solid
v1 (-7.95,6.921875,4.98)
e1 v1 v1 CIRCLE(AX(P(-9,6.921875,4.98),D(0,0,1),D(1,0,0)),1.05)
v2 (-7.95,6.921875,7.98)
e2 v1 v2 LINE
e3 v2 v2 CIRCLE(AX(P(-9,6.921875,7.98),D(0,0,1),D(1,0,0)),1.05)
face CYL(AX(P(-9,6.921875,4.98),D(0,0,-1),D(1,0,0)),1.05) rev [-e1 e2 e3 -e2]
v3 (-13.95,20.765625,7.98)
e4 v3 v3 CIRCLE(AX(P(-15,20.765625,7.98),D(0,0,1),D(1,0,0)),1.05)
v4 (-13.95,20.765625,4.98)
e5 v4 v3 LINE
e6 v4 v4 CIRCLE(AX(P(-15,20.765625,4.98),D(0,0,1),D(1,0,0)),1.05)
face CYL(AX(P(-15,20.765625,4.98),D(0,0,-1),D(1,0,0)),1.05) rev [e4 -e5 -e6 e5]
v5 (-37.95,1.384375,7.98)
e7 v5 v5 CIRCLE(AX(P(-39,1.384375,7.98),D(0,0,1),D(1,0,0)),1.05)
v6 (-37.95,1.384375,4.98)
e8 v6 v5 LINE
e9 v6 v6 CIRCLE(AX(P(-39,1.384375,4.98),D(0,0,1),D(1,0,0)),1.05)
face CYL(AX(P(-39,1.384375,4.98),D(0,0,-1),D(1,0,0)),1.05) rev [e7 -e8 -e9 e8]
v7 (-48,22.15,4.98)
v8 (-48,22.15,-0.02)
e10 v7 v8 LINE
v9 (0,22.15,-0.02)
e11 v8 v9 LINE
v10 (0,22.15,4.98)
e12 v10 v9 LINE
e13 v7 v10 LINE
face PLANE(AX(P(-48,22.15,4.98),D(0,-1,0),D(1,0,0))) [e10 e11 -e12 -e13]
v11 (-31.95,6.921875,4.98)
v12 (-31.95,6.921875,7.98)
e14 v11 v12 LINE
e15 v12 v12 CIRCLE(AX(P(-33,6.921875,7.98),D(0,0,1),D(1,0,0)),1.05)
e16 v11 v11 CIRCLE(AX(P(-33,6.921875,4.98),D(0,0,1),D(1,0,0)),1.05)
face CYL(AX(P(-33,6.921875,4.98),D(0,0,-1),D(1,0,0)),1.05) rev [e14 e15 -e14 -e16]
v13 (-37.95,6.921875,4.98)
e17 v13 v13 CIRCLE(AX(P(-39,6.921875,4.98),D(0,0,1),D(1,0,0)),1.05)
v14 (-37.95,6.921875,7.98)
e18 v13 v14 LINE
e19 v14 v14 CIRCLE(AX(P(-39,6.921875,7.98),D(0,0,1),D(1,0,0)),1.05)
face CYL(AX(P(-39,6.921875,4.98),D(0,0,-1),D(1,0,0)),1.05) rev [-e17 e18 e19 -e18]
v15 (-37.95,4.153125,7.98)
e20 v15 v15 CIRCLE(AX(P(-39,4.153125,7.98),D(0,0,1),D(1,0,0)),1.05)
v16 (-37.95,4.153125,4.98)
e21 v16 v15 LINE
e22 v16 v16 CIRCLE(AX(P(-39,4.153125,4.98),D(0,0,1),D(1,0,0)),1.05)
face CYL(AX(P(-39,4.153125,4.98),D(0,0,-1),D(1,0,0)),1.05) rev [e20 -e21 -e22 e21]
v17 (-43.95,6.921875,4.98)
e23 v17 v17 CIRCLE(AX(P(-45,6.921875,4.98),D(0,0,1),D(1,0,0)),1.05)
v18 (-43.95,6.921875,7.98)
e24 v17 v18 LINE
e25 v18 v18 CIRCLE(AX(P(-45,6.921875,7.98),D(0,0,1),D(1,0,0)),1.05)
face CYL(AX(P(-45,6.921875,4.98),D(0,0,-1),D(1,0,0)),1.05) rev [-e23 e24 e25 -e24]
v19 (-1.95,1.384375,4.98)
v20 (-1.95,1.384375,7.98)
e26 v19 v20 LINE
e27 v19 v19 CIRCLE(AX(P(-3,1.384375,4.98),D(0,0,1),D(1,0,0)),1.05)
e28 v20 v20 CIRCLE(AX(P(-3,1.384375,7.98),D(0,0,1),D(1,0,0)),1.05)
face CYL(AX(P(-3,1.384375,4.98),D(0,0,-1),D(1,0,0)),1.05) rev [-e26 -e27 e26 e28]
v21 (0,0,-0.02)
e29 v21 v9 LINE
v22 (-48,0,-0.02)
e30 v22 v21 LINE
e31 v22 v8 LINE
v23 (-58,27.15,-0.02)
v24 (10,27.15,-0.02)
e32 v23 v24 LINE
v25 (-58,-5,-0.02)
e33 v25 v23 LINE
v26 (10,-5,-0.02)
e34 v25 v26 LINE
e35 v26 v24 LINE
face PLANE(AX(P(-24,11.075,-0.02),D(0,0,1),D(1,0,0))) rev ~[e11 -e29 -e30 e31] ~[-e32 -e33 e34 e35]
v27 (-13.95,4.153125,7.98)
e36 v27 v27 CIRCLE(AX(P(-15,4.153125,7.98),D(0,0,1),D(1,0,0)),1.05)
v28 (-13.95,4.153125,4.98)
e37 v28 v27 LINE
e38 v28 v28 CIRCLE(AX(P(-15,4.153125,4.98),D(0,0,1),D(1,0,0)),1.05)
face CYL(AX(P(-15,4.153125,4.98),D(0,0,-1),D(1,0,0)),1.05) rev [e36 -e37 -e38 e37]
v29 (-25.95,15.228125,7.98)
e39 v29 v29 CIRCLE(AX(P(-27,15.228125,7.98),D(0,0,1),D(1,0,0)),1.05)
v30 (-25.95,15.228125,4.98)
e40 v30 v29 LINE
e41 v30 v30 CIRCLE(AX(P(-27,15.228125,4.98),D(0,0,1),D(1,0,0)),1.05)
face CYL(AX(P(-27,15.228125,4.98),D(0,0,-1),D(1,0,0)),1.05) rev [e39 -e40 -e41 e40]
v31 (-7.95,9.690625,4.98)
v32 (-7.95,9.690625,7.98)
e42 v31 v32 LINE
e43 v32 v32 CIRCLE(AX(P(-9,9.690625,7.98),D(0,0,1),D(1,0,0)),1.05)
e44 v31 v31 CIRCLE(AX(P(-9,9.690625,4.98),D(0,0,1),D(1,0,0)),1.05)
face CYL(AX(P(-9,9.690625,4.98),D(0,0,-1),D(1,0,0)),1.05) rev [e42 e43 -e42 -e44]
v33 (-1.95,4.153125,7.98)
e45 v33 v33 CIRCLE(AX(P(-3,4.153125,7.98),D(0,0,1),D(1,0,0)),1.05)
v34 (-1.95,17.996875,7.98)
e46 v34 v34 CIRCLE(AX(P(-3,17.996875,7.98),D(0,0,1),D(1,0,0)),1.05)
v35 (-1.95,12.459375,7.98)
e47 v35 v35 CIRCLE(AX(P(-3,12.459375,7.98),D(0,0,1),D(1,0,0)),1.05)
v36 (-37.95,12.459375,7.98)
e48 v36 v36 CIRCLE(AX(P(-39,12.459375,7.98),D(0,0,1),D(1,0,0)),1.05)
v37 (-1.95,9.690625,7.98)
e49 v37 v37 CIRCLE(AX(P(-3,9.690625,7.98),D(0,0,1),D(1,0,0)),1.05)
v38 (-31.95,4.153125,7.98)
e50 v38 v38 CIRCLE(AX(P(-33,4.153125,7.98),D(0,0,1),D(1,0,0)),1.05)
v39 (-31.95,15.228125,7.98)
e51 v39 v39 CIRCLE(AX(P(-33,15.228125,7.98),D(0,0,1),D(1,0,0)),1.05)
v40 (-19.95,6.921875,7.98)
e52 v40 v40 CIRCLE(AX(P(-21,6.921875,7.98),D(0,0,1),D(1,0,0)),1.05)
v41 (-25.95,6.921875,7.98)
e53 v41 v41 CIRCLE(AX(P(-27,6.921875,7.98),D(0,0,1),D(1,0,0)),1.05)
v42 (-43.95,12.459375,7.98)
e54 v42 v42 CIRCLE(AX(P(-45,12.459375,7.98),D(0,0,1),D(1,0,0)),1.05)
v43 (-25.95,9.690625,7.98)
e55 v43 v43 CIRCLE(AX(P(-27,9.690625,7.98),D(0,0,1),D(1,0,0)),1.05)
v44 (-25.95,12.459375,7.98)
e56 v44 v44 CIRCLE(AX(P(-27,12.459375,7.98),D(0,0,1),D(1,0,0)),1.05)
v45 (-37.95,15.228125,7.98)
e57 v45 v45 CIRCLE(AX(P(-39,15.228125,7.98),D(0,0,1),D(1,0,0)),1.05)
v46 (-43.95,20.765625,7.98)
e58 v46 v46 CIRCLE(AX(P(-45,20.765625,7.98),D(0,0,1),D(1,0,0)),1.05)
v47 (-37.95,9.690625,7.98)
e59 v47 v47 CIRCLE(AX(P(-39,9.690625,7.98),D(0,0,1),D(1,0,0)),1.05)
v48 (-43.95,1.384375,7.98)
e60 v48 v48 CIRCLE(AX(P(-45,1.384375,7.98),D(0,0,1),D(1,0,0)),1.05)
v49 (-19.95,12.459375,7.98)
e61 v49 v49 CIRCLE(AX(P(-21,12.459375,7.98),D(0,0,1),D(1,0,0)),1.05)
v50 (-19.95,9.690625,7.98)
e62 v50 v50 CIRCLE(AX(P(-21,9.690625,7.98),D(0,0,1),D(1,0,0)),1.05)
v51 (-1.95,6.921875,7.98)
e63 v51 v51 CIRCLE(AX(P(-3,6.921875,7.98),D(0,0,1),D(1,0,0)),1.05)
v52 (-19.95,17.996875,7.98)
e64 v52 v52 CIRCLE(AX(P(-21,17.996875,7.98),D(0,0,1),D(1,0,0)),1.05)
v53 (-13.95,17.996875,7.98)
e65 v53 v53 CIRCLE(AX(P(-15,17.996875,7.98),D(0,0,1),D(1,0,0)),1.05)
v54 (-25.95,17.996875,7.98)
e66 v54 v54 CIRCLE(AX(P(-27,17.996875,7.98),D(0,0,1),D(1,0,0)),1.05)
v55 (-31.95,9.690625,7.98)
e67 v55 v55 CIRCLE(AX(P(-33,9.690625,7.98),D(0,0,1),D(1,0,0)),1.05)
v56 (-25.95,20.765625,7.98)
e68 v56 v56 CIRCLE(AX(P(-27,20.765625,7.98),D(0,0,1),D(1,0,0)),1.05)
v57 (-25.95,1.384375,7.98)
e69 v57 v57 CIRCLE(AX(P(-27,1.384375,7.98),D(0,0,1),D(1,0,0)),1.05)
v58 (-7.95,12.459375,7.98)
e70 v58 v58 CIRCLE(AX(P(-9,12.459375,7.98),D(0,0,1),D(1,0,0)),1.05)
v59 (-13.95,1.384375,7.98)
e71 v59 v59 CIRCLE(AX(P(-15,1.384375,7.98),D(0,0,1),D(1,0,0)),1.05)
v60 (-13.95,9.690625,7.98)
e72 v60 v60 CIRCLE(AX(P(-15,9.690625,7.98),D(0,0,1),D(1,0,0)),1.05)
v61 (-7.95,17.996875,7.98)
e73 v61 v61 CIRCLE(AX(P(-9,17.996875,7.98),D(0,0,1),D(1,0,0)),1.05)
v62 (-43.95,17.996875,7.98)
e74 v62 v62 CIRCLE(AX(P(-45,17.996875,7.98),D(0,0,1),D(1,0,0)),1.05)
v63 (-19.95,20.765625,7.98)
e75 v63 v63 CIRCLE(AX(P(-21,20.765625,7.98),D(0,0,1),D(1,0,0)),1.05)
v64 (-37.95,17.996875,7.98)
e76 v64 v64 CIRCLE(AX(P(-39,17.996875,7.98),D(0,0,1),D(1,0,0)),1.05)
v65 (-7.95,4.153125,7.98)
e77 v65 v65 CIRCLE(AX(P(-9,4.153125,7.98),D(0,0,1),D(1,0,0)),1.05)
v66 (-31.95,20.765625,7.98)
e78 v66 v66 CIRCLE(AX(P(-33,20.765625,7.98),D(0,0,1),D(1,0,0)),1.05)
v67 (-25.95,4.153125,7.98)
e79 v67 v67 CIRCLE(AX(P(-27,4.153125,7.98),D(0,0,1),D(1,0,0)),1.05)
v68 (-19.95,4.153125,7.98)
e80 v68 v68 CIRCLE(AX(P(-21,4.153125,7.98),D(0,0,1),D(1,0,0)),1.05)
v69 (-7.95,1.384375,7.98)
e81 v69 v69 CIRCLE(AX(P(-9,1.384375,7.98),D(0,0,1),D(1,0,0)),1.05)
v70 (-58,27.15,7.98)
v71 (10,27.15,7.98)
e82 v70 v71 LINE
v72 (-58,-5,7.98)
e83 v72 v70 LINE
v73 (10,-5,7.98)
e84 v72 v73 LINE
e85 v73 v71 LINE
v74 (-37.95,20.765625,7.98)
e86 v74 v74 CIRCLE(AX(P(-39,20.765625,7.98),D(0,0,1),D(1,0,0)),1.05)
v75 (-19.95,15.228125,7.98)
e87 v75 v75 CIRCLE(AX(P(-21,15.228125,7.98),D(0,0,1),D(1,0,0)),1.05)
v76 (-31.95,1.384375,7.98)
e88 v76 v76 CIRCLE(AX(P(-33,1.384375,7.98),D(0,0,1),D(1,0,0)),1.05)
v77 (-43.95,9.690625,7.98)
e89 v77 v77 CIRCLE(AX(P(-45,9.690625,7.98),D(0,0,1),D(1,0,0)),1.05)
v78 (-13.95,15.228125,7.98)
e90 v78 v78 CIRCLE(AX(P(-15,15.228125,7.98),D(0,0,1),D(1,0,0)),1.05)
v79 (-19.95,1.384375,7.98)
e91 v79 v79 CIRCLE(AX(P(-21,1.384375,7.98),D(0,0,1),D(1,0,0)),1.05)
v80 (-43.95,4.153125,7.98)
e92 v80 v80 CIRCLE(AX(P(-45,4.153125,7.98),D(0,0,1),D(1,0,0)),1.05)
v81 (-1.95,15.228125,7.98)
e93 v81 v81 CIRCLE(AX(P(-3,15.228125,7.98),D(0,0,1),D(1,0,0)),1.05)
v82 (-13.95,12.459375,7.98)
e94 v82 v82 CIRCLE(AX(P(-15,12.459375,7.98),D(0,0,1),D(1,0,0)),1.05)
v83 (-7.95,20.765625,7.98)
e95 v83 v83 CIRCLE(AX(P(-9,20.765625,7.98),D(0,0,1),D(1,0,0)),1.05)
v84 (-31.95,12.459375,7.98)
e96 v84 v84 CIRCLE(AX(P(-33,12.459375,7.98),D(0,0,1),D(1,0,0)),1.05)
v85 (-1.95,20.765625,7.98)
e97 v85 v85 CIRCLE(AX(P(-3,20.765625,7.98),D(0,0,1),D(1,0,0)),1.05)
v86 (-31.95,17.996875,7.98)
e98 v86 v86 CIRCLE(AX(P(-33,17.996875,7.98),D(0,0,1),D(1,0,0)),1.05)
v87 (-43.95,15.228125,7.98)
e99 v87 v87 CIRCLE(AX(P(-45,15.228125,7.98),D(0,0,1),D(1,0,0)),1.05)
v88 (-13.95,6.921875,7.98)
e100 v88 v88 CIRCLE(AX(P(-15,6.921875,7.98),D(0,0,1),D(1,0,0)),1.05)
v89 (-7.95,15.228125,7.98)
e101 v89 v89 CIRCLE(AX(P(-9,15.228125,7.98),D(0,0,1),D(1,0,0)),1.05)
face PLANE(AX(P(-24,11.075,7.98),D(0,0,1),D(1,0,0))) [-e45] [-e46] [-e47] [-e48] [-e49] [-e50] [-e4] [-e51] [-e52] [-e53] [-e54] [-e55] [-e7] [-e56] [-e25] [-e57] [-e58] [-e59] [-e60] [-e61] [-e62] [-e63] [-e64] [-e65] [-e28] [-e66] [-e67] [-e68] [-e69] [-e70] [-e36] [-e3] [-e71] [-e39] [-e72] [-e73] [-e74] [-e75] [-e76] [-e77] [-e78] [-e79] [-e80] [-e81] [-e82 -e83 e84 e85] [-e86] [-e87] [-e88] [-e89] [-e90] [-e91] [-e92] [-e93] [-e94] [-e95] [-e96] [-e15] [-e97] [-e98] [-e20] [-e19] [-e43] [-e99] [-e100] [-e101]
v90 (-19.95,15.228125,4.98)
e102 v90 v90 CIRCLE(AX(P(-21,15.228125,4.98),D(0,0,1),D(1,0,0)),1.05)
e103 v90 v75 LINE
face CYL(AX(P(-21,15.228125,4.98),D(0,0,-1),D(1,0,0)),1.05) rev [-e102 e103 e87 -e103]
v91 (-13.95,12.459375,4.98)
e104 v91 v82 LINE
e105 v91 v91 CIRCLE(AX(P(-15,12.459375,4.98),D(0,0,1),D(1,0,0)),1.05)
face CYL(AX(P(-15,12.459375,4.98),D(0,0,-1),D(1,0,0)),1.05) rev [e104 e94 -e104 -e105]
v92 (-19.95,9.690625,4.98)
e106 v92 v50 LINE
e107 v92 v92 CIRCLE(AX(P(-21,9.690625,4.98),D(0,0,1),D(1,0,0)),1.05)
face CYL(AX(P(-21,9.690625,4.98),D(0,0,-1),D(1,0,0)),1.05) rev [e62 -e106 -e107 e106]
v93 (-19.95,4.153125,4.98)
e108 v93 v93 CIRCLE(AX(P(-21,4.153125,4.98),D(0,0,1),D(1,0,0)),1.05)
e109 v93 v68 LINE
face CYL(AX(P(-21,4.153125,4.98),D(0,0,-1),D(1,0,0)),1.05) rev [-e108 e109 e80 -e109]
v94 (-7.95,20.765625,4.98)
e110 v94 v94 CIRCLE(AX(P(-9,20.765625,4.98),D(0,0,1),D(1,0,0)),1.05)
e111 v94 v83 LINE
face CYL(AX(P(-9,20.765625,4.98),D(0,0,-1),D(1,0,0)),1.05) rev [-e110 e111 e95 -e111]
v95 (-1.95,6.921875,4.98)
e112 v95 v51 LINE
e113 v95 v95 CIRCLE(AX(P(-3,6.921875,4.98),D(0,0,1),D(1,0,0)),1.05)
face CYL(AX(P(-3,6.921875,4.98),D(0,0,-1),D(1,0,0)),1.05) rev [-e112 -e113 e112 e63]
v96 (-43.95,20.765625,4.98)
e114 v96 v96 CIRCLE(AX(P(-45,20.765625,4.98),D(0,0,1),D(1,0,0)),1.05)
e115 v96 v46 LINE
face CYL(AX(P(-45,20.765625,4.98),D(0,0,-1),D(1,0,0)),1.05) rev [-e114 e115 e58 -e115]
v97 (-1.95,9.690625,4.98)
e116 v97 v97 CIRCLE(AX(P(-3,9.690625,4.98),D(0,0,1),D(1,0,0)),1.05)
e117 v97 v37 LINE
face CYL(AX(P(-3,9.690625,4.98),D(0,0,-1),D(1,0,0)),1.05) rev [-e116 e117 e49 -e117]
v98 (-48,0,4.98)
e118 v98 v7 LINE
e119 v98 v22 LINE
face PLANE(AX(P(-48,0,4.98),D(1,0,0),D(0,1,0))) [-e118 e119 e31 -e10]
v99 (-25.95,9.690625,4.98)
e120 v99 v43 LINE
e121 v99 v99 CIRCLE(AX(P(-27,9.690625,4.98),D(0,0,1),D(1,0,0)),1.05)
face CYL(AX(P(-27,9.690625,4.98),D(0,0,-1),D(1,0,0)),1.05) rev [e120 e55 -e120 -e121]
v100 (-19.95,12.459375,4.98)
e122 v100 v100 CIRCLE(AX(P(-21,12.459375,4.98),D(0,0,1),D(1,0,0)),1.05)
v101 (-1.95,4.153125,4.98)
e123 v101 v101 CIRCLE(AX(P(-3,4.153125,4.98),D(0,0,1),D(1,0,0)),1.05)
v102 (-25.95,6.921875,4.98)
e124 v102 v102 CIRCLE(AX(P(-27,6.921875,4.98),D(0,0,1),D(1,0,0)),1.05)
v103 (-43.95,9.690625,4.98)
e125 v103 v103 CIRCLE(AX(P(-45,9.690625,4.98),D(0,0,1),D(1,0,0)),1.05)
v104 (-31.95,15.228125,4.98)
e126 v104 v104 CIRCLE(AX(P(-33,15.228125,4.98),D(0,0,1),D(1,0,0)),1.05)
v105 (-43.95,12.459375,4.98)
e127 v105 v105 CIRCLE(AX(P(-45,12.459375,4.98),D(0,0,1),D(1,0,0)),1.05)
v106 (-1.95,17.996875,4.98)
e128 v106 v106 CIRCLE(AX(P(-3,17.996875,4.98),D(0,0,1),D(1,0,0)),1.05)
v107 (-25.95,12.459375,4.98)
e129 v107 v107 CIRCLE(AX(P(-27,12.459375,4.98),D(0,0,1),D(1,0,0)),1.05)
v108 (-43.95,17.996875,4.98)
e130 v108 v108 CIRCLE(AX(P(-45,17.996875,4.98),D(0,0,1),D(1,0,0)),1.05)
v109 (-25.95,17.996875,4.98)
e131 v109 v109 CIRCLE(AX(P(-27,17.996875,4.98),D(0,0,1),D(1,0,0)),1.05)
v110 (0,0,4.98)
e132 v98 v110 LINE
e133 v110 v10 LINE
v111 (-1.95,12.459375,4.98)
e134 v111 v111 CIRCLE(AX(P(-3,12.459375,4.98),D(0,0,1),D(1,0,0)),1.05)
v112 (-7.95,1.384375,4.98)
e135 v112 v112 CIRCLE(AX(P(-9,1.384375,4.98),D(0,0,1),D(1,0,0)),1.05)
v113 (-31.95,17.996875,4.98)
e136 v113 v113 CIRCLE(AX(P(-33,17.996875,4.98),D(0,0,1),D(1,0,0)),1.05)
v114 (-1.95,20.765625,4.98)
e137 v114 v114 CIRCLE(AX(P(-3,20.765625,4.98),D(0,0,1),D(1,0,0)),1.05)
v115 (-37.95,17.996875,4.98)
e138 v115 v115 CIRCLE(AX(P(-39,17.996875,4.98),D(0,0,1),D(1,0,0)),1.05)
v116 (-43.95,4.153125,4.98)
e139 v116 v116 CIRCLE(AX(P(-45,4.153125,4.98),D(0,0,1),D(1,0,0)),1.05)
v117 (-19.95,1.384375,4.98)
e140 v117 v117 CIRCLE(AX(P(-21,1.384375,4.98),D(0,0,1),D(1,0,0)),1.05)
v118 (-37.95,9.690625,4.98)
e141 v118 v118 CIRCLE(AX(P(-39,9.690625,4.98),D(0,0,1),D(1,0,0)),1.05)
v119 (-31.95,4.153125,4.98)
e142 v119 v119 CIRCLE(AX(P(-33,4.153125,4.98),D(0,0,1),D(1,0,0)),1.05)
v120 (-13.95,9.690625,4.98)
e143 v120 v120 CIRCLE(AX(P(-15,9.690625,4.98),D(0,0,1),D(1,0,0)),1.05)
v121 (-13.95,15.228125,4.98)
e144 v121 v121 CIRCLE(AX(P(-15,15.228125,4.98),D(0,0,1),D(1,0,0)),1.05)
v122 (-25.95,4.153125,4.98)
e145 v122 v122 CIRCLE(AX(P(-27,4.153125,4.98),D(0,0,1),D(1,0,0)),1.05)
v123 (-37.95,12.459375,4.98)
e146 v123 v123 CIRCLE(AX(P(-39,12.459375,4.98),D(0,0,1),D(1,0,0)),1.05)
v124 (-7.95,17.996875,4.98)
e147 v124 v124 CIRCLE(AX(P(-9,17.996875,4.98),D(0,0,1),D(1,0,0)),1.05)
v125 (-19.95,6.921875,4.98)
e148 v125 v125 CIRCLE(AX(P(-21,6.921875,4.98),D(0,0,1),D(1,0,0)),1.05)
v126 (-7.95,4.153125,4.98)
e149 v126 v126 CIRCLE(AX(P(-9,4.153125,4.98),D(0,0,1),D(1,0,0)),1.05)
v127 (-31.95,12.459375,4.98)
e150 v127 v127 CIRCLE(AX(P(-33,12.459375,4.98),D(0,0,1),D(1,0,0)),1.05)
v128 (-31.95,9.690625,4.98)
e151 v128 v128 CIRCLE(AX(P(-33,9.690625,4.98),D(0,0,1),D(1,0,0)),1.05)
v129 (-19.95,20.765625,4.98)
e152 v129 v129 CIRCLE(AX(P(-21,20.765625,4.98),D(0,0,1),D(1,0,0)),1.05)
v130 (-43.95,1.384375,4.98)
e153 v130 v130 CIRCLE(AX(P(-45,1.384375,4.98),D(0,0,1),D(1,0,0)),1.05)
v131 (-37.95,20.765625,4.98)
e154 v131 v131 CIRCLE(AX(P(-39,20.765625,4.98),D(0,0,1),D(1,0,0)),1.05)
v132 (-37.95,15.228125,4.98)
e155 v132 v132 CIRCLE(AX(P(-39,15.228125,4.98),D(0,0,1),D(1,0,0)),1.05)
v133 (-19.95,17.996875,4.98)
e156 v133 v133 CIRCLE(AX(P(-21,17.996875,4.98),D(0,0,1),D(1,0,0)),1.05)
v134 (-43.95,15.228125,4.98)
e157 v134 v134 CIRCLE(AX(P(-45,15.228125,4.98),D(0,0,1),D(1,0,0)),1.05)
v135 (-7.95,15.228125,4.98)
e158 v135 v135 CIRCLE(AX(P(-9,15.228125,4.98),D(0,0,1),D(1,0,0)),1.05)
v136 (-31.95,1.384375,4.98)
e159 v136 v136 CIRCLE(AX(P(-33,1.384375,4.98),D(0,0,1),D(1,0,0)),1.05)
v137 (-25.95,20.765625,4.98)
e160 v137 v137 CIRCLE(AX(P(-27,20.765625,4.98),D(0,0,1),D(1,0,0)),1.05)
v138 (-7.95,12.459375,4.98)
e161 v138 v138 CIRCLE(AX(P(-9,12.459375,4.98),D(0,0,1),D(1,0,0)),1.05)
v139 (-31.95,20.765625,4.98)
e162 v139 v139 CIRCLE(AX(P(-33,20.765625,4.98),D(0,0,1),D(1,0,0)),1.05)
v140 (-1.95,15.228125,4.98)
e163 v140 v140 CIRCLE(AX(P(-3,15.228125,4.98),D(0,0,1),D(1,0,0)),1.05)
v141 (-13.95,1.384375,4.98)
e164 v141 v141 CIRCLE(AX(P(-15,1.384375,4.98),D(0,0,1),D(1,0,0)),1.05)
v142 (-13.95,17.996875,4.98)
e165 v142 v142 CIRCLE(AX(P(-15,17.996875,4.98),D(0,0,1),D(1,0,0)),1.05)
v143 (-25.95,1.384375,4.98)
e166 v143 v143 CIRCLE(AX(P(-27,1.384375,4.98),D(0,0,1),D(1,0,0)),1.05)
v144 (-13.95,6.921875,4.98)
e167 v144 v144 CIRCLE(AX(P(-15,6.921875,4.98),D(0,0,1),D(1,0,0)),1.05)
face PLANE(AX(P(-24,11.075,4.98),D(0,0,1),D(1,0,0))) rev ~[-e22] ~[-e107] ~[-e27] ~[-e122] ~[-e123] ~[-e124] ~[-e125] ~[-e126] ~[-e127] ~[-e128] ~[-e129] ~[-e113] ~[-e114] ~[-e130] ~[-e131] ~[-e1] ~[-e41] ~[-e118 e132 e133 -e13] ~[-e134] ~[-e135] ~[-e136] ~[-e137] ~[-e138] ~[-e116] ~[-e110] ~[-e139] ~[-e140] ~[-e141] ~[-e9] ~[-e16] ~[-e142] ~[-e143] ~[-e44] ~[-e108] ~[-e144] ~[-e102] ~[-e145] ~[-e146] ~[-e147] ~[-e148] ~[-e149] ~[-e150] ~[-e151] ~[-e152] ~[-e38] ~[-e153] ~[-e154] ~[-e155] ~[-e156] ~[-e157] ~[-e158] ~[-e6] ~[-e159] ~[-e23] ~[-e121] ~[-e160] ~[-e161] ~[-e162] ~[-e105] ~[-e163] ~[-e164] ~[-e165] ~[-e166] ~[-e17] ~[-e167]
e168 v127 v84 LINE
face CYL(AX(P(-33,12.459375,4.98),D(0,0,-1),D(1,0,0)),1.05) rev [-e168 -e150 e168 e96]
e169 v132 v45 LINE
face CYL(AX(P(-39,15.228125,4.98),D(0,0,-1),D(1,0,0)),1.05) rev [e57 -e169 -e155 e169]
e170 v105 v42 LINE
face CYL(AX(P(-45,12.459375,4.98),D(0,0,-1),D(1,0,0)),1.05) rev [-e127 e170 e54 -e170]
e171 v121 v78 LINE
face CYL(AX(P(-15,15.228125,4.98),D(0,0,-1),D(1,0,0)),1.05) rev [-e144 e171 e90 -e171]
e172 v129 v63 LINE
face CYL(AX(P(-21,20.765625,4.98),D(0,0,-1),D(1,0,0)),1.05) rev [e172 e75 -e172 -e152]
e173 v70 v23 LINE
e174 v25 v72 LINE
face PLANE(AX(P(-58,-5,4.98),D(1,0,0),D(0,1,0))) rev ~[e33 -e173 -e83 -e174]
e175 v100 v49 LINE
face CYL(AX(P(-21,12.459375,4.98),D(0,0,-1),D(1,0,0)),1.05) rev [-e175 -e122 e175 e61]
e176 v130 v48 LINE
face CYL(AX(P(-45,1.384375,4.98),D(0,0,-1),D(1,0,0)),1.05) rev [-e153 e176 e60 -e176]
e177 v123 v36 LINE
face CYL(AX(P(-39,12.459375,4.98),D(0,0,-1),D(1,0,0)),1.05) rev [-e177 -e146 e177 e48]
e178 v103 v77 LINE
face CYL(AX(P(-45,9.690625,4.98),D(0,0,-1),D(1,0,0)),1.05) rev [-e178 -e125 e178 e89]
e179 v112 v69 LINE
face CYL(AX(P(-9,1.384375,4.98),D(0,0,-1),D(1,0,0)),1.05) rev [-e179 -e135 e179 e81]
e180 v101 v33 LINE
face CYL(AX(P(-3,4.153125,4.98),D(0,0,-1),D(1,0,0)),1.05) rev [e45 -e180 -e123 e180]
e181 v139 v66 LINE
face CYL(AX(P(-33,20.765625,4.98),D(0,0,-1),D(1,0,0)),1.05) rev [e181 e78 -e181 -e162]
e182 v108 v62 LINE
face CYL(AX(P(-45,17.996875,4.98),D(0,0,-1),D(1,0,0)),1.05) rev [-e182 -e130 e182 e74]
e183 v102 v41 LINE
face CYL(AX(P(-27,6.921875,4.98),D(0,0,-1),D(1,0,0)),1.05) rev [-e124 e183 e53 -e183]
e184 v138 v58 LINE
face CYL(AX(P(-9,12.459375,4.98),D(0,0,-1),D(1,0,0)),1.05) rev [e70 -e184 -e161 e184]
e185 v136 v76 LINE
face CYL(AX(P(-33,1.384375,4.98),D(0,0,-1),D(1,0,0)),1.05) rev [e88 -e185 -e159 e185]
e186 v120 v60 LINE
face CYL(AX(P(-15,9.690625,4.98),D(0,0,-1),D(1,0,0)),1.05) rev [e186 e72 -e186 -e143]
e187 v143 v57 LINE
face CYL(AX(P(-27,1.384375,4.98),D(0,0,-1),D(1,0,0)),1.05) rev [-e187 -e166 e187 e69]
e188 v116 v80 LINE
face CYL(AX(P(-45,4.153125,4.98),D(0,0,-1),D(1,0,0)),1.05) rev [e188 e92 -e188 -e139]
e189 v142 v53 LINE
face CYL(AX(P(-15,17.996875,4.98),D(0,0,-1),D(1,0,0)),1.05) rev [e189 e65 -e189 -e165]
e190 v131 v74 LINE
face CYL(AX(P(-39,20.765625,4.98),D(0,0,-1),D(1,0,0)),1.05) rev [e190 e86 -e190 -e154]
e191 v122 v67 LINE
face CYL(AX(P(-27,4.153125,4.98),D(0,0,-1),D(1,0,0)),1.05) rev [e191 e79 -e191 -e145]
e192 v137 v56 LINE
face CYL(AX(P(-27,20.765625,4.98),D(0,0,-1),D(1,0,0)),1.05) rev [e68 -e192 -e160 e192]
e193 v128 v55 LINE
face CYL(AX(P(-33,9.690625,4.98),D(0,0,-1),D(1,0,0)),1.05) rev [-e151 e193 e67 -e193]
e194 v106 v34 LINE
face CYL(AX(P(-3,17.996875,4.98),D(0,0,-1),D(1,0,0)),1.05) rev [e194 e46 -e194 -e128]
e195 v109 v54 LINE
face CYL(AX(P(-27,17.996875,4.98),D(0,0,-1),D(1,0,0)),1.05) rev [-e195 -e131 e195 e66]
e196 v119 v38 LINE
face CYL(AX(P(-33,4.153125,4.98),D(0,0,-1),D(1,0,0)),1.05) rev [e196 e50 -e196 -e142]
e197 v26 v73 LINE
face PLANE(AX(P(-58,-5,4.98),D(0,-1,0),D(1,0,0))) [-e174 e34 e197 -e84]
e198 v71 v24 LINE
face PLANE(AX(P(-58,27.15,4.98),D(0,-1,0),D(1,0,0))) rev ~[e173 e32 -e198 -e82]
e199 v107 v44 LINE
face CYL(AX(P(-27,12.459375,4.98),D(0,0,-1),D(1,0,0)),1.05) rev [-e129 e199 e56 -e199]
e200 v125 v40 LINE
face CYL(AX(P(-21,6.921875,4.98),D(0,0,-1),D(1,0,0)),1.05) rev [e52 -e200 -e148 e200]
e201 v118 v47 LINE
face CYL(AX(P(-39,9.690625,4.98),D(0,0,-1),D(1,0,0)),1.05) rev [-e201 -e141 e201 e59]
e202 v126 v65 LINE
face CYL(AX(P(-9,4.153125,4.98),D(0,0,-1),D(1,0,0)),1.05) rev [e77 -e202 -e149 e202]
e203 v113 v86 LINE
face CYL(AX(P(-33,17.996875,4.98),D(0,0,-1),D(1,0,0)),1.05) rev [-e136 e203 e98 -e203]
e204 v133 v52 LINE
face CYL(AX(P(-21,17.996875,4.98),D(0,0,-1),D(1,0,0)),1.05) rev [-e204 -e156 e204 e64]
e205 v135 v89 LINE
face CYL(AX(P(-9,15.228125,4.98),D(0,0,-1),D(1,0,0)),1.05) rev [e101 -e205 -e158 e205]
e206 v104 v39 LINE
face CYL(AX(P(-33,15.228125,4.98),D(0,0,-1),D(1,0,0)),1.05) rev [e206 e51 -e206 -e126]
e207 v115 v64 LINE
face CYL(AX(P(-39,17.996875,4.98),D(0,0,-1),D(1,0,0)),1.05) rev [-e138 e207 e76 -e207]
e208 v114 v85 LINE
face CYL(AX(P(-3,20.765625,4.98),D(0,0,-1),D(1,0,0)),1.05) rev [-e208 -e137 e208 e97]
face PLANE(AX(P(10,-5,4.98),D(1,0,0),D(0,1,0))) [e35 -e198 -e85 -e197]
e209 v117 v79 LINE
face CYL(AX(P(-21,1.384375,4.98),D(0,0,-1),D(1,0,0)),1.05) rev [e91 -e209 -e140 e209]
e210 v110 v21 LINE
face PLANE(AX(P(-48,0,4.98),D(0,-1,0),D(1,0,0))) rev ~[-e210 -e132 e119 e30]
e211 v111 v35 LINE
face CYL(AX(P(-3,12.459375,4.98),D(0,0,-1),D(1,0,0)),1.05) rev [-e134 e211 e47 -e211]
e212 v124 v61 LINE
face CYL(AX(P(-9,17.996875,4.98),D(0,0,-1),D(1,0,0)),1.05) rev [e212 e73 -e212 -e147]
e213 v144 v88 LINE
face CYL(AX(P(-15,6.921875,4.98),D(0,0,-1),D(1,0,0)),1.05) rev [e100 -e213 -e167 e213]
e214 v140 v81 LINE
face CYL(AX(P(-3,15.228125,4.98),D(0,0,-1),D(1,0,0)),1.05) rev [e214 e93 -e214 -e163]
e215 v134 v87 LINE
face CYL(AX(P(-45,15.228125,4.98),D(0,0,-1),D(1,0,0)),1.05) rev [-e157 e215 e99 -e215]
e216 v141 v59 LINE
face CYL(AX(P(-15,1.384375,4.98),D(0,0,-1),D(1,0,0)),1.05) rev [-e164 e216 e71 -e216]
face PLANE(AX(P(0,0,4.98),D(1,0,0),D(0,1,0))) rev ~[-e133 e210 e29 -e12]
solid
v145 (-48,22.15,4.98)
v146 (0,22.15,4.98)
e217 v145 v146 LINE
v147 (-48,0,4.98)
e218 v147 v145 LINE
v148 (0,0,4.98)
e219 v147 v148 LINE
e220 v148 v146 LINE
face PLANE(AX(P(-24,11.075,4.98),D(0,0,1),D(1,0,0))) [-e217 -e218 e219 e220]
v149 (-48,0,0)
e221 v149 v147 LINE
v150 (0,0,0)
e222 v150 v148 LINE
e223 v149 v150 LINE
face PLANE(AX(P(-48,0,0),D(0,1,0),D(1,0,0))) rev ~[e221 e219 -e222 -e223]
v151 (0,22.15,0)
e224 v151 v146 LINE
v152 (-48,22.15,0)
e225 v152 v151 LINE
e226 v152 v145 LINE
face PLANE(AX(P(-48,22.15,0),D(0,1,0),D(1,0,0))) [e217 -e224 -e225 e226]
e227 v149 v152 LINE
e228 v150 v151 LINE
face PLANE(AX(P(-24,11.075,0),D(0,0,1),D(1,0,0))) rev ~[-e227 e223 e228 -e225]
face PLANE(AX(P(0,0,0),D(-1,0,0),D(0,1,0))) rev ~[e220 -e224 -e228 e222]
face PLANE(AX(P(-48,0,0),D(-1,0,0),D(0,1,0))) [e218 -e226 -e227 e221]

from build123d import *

# Parameters (mm, degrees)
F0_W     = 48
F0_H     = 22.15
F1_DEPTH = 4.98
F2_W     = 68
F2_H     = 32.15
F2_W_2   = 48
F2_H_2   = 22.15
F2_R     = 1.05
F3_DEPTH = 3
F4_DEPTH = 5


# Not quite as in the source:
# - a feature names something its author has since deleted; it is built from what else it names


with BuildPart() as f1:
    # F0 (on Top) → F1 (new body)
    with BuildSketch(Plane.XY):
        with Locations((-24, 11.075)):
            Rectangle(F0_W, F0_H)
    extrude(amount=F1_DEPTH)


with BuildPart() as f3:
    # F2 (on face) → F3 (new body)
    with BuildSketch(Plane.XY.offset(4.98)):
        with Locations((-24, 11.075)):
            Rectangle(F2_W, F2_H)
        with Locations((-24, 11.075)):
            Rectangle(F2_W_2, F2_H_2, mode=Mode.SUBTRACT)
        with Locations((-24, 11.075)):
            Rectangle(F2_W_2, F2_H_2)
        with Locations((-45, 1.384375)):
            Circle(F2_R, mode=Mode.SUBTRACT)
        with Locations((-39, 1.384375)):
            Circle(F2_R, mode=Mode.SUBTRACT)
        with Locations((-33, 1.384375)):
            Circle(F2_R, mode=Mode.SUBTRACT)
        with Locations((-27, 1.384375)):
            Circle(F2_R, mode=Mode.SUBTRACT)
        with Locations((-45, 4.153125)):
            Circle(F2_R, mode=Mode.SUBTRACT)
        with Locations((-45, 6.921875)):
            Circle(F2_R, mode=Mode.SUBTRACT)
        with Locations((-45, 9.690625)):
            Circle(F2_R, mode=Mode.SUBTRACT)
        with Locations((-39, 4.153125)):
            Circle(F2_R, mode=Mode.SUBTRACT)
        with Locations((-33, 4.153125)):
            Circle(F2_R, mode=Mode.SUBTRACT)
        with Locations((-39, 6.921875)):
            Circle(F2_R, mode=Mode.SUBTRACT)
        with Locations((-33, 6.921875)):
            Circle(F2_R, mode=Mode.SUBTRACT)
        with Locations((-27, 4.153125)):
            Circle(F2_R, mode=Mode.SUBTRACT)
        with Locations((-27, 6.921875)):
            Circle(F2_R, mode=Mode.SUBTRACT)
        with Locations((-39, 9.690625)):
            Circle(F2_R, mode=Mode.SUBTRACT)
        with Locations((-33, 9.690625)):
            Circle(F2_R, mode=Mode.SUBTRACT)
        with Locations((-27, 9.690625)):
            Circle(F2_R, mode=Mode.SUBTRACT)
        with Locations((-21, 1.384375)):
            Circle(F2_R, mode=Mode.SUBTRACT)
        with Locations((-15, 1.384375)):
            Circle(F2_R, mode=Mode.SUBTRACT)
        with Locations((-9, 1.384375)):
            Circle(F2_R, mode=Mode.SUBTRACT)
        with Locations((-3, 1.384375)):
            Circle(F2_R, mode=Mode.SUBTRACT)
        with Locations((-21, 4.153125)):
            Circle(F2_R, mode=Mode.SUBTRACT)
        with Locations((-21, 6.921875)):
            Circle(F2_R, mode=Mode.SUBTRACT)
        with Locations((-15, 4.153125)):
            Circle(F2_R, mode=Mode.SUBTRACT)
        with Locations((-9, 4.153125)):
            Circle(F2_R, mode=Mode.SUBTRACT)
        with Locations((-15, 6.921875)):
            Circle(F2_R, mode=Mode.SUBTRACT)
        with Locations((-9, 6.921875)):
            Circle(F2_R, mode=Mode.SUBTRACT)
        with Locations((-21, 9.690625)):
            Circle(F2_R, mode=Mode.SUBTRACT)
        with Locations((-15, 9.690625)):
            Circle(F2_R, mode=Mode.SUBTRACT)
        with Locations((-9, 9.690625)):
            Circle(F2_R, mode=Mode.SUBTRACT)
        with Locations((-3, 4.153125)):
            Circle(F2_R, mode=Mode.SUBTRACT)
        with Locations((-3, 6.921875)):
            Circle(F2_R, mode=Mode.SUBTRACT)
        with Locations((-3, 9.690625)):
            Circle(F2_R, mode=Mode.SUBTRACT)
        with Locations((-45, 12.459375)):
            Circle(F2_R, mode=Mode.SUBTRACT)
        with Locations((-45, 15.228125)):
            Circle(F2_R, mode=Mode.SUBTRACT)
        with Locations((-45, 17.996875)):
            Circle(F2_R, mode=Mode.SUBTRACT)
        with Locations((-39, 12.459375)):
            Circle(F2_R, mode=Mode.SUBTRACT)
        with Locations((-33, 12.459375)):
            Circle(F2_R, mode=Mode.SUBTRACT)
        with Locations((-27, 12.459375)):
            Circle(F2_R, mode=Mode.SUBTRACT)
        with Locations((-39, 15.228125)):
            Circle(F2_R, mode=Mode.SUBTRACT)
        with Locations((-33, 15.228125)):
            Circle(F2_R, mode=Mode.SUBTRACT)
        with Locations((-39, 17.996875)):
            Circle(F2_R, mode=Mode.SUBTRACT)
        with Locations((-33, 17.996875)):
            Circle(F2_R, mode=Mode.SUBTRACT)
        with Locations((-27, 15.228125)):
            Circle(F2_R, mode=Mode.SUBTRACT)
        with Locations((-27, 17.996875)):
            Circle(F2_R, mode=Mode.SUBTRACT)
        with Locations((-45, 20.765625)):
            Circle(F2_R, mode=Mode.SUBTRACT)
        with Locations((-39, 20.765625)):
            Circle(F2_R, mode=Mode.SUBTRACT)
        with Locations((-33, 20.765625)):
            Circle(F2_R, mode=Mode.SUBTRACT)
        with Locations((-27, 20.765625)):
            Circle(F2_R, mode=Mode.SUBTRACT)
        with Locations((-21, 12.459375)):
            Circle(F2_R, mode=Mode.SUBTRACT)
        with Locations((-15, 12.459375)):
            Circle(F2_R, mode=Mode.SUBTRACT)
        with Locations((-9, 12.459375)):
            Circle(F2_R, mode=Mode.SUBTRACT)
        with Locations((-21, 15.228125)):
            Circle(F2_R, mode=Mode.SUBTRACT)
        with Locations((-21, 17.996875)):
            Circle(F2_R, mode=Mode.SUBTRACT)
        with Locations((-15, 15.228125)):
            Circle(F2_R, mode=Mode.SUBTRACT)
        with Locations((-9, 15.228125)):
            Circle(F2_R, mode=Mode.SUBTRACT)
        with Locations((-15, 17.996875)):
            Circle(F2_R, mode=Mode.SUBTRACT)
        with Locations((-9, 17.996875)):
            Circle(F2_R, mode=Mode.SUBTRACT)
        with Locations((-3, 12.459375)):
            Circle(F2_R, mode=Mode.SUBTRACT)
        with Locations((-3, 15.228125)):
            Circle(F2_R, mode=Mode.SUBTRACT)
        with Locations((-3, 17.996875)):
            Circle(F2_R, mode=Mode.SUBTRACT)
        with Locations((-21, 20.765625)):
            Circle(F2_R, mode=Mode.SUBTRACT)
        with Locations((-15, 20.765625)):
            Circle(F2_R, mode=Mode.SUBTRACT)
        with Locations((-9, 20.765625)):
            Circle(F2_R, mode=Mode.SUBTRACT)
        with Locations((-3, 20.765625)):
            Circle(F2_R, mode=Mode.SUBTRACT)
    extrude(amount=F3_DEPTH)

    # F2 (on face) → F4 (join)
    with BuildSketch(Plane.XY.offset(4.98)):
        with Locations((-24, 11.075)):
            Rectangle(F2_W, F2_H)
        with Locations((-24, 11.075)):
            Rectangle(F2_W_2, F2_H_2, mode=Mode.SUBTRACT)
    extrude(amount=-F4_DEPTH)


solid = Compound([f1.part, f3.part])
